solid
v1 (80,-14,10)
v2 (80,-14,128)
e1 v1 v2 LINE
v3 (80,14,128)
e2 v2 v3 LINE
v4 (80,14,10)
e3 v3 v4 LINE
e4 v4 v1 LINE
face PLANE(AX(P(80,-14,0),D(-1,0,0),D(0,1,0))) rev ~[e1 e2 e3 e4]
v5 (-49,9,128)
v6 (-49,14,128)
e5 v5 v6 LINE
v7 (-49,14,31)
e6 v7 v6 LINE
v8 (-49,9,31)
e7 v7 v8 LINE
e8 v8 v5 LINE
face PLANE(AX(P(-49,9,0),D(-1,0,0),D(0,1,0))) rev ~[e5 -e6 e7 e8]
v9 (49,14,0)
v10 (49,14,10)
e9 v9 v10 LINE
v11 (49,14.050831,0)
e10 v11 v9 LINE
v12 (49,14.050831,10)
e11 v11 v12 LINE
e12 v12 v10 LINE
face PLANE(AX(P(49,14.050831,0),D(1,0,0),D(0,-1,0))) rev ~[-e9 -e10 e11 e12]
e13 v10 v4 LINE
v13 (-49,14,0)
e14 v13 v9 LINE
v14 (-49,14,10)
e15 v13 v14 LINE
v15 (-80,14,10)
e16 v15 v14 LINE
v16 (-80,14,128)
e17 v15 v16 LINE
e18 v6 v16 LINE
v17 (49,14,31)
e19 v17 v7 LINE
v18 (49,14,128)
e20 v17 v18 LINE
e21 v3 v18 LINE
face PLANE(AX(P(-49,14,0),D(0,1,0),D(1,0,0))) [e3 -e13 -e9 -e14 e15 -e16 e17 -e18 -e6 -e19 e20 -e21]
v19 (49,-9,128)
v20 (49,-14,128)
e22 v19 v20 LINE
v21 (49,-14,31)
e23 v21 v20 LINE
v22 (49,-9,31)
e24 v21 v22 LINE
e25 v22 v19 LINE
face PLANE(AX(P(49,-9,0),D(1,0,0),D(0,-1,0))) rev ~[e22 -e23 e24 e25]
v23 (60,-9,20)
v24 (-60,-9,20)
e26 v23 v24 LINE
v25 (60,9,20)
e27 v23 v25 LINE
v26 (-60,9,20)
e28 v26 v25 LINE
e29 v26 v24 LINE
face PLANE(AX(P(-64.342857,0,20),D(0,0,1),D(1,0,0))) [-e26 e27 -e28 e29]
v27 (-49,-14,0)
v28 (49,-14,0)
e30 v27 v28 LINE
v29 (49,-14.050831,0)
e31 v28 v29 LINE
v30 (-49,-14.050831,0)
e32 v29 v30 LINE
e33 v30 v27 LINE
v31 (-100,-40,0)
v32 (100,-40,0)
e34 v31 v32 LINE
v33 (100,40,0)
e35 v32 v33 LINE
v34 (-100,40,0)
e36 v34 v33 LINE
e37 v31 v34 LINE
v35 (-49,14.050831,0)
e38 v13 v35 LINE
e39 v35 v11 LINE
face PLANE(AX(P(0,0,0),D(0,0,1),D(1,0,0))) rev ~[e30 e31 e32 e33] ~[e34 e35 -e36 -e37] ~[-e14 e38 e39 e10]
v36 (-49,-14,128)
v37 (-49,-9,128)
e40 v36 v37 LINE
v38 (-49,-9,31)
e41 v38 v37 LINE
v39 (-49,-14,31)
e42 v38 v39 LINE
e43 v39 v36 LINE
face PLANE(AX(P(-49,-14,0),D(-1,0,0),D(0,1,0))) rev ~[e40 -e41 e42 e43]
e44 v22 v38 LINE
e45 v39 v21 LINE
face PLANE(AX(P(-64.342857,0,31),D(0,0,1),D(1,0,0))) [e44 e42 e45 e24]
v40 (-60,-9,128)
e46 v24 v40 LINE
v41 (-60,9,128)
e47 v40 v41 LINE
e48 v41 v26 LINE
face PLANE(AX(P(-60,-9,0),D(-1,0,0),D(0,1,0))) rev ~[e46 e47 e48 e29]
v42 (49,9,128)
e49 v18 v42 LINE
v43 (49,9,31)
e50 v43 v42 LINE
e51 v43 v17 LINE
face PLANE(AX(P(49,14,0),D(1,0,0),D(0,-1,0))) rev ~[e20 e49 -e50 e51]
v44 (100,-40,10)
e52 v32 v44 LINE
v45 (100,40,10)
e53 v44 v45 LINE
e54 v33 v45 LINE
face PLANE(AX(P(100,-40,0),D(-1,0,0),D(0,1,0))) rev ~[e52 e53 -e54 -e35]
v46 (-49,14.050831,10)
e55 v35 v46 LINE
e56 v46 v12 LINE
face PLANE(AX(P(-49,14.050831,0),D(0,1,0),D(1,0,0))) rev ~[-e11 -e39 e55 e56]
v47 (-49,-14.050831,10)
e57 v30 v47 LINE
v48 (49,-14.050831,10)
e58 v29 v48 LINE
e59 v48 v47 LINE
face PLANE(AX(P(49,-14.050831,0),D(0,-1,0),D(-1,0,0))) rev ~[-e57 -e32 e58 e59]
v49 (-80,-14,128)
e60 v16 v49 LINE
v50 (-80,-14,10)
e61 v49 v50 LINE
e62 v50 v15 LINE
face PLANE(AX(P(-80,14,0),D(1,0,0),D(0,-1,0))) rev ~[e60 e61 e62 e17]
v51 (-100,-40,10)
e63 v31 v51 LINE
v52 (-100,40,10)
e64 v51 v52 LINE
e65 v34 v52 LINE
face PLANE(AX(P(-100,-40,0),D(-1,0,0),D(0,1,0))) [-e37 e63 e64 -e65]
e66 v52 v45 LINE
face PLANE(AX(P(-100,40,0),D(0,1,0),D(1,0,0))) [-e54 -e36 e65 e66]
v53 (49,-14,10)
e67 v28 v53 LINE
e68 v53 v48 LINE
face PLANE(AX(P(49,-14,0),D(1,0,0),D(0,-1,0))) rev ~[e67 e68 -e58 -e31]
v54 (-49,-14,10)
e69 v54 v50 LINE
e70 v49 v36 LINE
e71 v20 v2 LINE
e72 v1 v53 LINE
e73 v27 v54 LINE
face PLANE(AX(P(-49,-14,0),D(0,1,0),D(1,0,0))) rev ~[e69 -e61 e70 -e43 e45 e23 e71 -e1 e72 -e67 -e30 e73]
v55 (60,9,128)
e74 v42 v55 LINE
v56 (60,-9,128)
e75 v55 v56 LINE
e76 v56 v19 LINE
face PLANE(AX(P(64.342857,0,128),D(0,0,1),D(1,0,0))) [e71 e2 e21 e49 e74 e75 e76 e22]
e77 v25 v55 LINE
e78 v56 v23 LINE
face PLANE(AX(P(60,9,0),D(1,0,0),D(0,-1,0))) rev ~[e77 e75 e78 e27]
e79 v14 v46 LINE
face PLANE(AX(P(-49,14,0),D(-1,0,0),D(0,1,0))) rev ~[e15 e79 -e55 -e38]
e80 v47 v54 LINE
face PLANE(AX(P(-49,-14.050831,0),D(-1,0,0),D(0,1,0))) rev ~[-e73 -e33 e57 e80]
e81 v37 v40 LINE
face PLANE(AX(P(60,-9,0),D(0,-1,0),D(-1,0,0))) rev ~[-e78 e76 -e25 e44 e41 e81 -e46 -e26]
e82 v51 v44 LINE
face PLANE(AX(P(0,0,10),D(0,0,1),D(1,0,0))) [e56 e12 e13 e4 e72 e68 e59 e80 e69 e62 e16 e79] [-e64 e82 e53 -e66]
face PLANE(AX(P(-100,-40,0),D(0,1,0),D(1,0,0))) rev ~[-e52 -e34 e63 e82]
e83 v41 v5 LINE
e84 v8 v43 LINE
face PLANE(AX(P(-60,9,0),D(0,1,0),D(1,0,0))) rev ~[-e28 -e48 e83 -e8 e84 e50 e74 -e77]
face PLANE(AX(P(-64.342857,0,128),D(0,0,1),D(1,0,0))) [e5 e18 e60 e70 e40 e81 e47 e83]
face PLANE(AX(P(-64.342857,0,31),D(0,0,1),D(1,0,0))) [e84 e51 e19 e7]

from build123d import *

# Parameters (mm, degrees)
F0_W     = 200
F0_H     = 80
F0_W_2   = 98
F0_H_2   = 18
F0_H_3   = 5
F0_W_3   = 11
F1_DEPTH = 10
F2_DEPTH = 20
F3_DEPTH = 31
F4_DEPTH = 128


# Not quite as in the source:
# - a feature names something its author has since deleted; it is built from what else it names


with BuildPart() as f1:
    # F0 (on Top) → F1 (new body)
    with BuildSketch(Plane.XY):
        Rectangle(F0_W, F0_H)
        Polygon((80, 14), (80, -14), (49, -14), (49, -14.0508310869), (-49, -14.0508310869), (-49, -14), (-80, -14), (-80, 14), (-49, 14), (-49, 14.0508310869), (49, 14.0508310869), (49, 14), align=None, mode=Mode.SUBTRACT)
        Rectangle(F0_W_2, F0_H_2)
        Polygon((49, -14), (80, -14), (80, 14), (49, 14), (49, 9), (60, 9), (60, -9), (49, -9), align=None)
        Polygon((-80, -14), (-49, -14), (-49, -9), (-60, -9), (-60, 9), (-49, 9), (-49, 14), (-80, 14), align=None)
        with Locations((0, -11.5)):
            Rectangle(F0_W_2, F0_H_3)
        with Locations((0, 11.5)):
            Rectangle(F0_W_2, F0_H_3)
        with Locations((54.5, 0)):
            Rectangle(F0_W_3, F0_H_2)
        with Locations((-54.5, 0)):
            Rectangle(F0_W_3, F0_H_2)
    extrude(amount=F1_DEPTH)

    # F0 (on Top) → F2 (join)
    with BuildSketch(Plane.XY):
        Polygon((-80, -14), (-49, -14), (-49, -9), (-60, -9), (-60, 9), (-49, 9), (-49, 14), (-80, 14), align=None)
        with Locations((-54.5, 0)):
            Rectangle(F0_W_3, F0_H_2)
        Rectangle(F0_W_2, F0_H_2)
        with Locations((54.5, 0)):
            Rectangle(F0_W_3, F0_H_2)
        Polygon((49, -14), (80, -14), (80, 14), (49, 14), (49, 9), (60, 9), (60, -9), (49, -9), align=None)
        with Locations((0, -11.5)):
            Rectangle(F0_W_2, F0_H_3)
        with Locations((0, 11.5)):
            Rectangle(F0_W_2, F0_H_3)
    extrude(amount=F2_DEPTH)

    # F0 (on Top) → F3 (join)
    with BuildSketch(Plane.XY):
        Polygon((-80, -14), (-49, -14), (-49, -9), (-60, -9), (-60, 9), (-49, 9), (-49, 14), (-80, 14), align=None)
        with Locations((0, 11.5)):
            Rectangle(F0_W_2, F0_H_3)
        with Locations((0, -11.5)):
            Rectangle(F0_W_2, F0_H_3)
        Polygon((49, -14), (80, -14), (80, 14), (49, 14), (49, 9), (60, 9), (60, -9), (49, -9), align=None)
    extrude(amount=F3_DEPTH)

    # F0 (on Top) → F4 (join)
    with BuildSketch(Plane.XY):
        Polygon((-80, -14), (-49, -14), (-49, -9), (-60, -9), (-60, 9), (-49, 9), (-49, 14), (-80, 14), align=None)
        Polygon((49, -14), (80, -14), (80, 14), (49, 14), (49, 9), (60, 9), (60, -9), (49, -9), align=None)
    extrude(amount=F4_DEPTH)


solid = f1.part
